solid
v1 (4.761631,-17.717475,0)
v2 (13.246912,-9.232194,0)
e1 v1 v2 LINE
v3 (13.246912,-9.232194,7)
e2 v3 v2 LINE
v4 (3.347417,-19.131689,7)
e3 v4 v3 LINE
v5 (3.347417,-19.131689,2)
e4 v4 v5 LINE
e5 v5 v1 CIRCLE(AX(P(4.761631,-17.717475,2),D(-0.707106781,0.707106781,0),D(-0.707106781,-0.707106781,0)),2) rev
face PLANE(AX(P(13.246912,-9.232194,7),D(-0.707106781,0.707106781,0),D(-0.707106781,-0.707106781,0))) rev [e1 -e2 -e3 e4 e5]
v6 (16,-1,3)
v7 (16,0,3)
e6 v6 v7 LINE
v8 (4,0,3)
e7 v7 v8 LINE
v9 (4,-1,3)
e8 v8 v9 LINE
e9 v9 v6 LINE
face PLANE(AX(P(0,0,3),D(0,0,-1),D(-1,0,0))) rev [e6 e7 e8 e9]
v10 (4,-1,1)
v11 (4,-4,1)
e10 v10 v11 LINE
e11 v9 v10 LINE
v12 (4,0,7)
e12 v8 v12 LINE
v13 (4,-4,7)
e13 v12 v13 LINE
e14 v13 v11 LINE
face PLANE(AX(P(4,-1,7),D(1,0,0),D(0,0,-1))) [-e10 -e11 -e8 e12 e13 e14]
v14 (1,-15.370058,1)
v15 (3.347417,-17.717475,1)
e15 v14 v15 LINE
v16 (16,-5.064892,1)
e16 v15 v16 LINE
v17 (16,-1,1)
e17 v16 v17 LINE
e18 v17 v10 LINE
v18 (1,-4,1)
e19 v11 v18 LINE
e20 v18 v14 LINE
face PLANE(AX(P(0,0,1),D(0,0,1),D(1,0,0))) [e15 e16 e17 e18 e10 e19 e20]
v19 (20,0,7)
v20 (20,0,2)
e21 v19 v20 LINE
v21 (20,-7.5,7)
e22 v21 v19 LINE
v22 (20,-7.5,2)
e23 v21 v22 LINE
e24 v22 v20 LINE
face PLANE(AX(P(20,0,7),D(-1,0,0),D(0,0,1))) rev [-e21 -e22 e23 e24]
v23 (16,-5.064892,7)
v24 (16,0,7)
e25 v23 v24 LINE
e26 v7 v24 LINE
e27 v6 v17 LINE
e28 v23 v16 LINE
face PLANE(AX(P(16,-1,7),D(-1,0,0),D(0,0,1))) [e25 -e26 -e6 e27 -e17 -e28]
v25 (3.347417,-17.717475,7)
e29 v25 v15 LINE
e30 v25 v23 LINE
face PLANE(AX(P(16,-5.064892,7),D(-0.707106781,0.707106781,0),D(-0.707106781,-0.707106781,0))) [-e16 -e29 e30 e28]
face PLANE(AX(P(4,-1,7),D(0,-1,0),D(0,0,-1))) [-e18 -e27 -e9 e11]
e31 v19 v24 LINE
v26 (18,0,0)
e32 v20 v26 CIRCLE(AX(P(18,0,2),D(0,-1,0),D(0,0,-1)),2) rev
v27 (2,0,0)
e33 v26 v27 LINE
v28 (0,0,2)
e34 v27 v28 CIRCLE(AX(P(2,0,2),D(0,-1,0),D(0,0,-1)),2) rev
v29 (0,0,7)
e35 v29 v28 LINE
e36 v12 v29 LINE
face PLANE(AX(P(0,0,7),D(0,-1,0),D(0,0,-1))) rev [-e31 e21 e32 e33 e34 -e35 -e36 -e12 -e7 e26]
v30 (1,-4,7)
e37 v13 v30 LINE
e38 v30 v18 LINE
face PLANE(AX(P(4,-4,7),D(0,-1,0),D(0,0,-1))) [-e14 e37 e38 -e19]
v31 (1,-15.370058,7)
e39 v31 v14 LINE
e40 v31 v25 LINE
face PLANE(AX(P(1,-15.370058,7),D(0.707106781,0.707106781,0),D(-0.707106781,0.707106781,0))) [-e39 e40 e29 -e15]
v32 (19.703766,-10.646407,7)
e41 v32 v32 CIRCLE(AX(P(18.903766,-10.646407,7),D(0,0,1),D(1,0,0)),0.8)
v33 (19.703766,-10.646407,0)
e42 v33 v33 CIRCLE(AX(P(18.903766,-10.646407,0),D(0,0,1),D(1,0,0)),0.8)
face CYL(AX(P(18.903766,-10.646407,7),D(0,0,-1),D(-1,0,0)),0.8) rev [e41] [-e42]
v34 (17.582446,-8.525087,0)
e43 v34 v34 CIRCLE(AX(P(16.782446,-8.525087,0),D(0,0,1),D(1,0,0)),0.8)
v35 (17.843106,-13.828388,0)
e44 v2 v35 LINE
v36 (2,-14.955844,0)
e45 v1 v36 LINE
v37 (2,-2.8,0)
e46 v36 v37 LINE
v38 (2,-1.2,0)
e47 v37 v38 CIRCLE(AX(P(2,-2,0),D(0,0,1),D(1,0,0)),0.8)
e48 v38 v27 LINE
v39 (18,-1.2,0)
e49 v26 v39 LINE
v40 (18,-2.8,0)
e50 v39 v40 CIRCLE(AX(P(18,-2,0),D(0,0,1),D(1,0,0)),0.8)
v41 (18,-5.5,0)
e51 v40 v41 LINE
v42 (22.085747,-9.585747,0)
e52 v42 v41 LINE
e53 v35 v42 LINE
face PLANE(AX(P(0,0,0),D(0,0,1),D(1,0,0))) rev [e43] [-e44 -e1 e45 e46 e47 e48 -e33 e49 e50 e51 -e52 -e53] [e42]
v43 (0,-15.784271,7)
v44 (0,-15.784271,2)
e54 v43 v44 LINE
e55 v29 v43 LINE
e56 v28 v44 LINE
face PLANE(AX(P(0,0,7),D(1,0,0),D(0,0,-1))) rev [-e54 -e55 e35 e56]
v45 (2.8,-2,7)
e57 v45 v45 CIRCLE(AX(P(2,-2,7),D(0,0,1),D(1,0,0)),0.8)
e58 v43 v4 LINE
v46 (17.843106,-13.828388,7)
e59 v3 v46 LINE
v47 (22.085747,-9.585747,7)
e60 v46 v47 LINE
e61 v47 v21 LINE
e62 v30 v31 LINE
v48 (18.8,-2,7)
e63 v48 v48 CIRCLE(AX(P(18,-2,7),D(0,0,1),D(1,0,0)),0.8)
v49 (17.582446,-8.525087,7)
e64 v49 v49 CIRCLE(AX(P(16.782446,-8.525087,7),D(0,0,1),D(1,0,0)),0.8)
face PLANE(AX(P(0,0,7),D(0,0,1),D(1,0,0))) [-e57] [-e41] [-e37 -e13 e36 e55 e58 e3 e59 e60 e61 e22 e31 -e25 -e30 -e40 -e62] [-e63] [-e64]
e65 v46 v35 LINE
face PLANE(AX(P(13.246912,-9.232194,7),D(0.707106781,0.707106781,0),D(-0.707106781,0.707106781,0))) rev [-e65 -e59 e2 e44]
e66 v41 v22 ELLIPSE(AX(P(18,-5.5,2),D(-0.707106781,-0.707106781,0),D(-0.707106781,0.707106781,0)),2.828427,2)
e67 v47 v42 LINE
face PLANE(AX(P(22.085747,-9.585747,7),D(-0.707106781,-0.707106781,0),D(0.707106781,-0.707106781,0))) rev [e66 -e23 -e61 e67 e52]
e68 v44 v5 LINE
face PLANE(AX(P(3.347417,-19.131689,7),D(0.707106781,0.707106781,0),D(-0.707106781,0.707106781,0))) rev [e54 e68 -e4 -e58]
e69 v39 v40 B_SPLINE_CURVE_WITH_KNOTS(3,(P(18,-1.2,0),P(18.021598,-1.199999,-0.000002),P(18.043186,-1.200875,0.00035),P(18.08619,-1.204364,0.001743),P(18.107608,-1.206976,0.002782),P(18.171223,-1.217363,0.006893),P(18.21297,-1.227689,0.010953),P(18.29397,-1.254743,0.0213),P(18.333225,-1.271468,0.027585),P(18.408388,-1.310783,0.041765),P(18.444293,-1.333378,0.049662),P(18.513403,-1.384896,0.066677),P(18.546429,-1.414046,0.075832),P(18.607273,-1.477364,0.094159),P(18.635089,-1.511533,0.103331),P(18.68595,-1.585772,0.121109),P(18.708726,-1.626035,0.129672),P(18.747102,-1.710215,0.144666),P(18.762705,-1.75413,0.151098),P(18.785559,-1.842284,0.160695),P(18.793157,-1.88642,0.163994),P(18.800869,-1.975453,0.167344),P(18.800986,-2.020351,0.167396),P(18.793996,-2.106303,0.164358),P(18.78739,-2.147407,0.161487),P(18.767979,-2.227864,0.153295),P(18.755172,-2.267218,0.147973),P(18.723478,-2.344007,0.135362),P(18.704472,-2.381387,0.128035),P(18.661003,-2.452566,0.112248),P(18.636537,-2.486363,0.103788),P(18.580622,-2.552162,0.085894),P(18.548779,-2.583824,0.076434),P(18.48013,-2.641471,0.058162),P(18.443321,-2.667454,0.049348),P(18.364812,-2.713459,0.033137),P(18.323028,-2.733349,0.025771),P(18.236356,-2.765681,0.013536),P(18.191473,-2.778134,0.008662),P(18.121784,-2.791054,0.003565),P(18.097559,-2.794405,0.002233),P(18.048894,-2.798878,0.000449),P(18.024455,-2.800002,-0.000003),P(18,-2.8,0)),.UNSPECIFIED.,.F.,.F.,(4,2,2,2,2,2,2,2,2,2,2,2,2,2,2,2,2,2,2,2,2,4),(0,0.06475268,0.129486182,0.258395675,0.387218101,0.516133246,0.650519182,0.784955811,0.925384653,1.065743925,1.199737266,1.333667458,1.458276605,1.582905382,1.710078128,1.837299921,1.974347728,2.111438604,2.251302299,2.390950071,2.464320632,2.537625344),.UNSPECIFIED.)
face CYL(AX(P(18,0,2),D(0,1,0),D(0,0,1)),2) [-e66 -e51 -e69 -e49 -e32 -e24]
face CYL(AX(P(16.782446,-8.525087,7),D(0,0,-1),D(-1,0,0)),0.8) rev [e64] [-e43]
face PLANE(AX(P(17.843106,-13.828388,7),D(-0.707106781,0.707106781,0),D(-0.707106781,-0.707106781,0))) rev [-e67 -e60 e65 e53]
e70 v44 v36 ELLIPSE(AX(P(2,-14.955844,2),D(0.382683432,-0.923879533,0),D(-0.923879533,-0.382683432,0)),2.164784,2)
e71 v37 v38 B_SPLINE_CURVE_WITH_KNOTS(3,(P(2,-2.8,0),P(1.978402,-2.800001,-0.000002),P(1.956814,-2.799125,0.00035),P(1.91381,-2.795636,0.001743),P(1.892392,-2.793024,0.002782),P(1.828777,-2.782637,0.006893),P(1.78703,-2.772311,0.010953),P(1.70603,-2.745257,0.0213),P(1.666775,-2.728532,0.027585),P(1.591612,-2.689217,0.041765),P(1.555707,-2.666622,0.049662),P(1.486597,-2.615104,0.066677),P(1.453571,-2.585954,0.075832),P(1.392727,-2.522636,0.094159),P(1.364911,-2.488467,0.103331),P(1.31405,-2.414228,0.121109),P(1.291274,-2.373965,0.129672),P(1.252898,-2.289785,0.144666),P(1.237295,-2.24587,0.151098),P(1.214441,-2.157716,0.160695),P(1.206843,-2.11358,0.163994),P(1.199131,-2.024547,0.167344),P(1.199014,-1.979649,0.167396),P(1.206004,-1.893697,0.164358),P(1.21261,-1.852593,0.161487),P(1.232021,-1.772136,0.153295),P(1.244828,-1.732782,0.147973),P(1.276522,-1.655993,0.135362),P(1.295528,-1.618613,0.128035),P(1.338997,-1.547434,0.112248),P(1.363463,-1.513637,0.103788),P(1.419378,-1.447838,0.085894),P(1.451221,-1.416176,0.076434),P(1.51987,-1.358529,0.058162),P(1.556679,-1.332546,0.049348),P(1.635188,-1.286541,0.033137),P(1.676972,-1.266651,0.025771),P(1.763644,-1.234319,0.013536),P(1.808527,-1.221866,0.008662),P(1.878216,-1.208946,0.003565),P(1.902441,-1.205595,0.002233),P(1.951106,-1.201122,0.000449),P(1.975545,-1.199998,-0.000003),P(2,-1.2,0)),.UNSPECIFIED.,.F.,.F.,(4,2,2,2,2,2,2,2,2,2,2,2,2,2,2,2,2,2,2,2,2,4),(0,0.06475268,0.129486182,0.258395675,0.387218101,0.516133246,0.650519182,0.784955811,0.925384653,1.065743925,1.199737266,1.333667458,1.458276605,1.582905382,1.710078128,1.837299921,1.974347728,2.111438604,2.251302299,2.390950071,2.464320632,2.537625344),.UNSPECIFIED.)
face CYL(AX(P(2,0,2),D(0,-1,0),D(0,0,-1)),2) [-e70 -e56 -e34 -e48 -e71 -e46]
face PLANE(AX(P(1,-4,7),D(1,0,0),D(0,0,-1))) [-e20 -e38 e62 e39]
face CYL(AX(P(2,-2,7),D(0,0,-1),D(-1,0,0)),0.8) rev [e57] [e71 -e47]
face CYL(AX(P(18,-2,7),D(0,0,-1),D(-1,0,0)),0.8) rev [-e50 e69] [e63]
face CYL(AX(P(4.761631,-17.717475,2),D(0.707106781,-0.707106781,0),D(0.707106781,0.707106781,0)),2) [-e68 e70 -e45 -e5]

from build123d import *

# Parameters (mm, degrees)
BOSS_EXTRUDE1_DEPTH = 7
BOSS_EXTRUDE2_DEPTH = 1
SKETCH5_R           = 0.799999999
SKETCH5_R_2         = 0.800000001
SCREW_HOLES_DEPTH   = 31.046659105
FILLET1_R           = 2
CUT_EXTRUDE2_START  = 7
SKETCH7_W           = 11.999999998
SKETCH7_H           = 4
CUT_EXTRUDE2_DEPTH  = 4


with BuildPart() as part:
    # Sketch1 → Boss-Extrude1 (new body)
    with BuildSketch(Plane.XY):
        Polygon((0, 0), (19.999999998, 0), (19.999999998, -7.5), (22.085746954, -9.585746956), (17.843106269, -13.828387641), (13.246912191, -9.232193563), (3.347417254, -19.1316885), (0, -15.784271246), align=None)
        Polygon((4, -1), (4, -4), (1, -4), (1, -15.370057685), (3.347417253, -17.717474938), (15.999999998, -5.064892192), (15.999999998, -1), align=None, mode=Mode.SUBTRACT)
    extrude(amount=BOSS_EXTRUDE1_DEPTH)

    # Sketch6 → Boss-Extrude2 (add)
    with BuildSketch(Plane.XY):
        Polygon((0, 0), (19.999999998, 0), (19.999999998, -7.5), (22.085746954, -9.585746956), (17.843106269, -13.828387641), (13.246912191, -9.232193563), (3.347417254, -19.1316885), (0, -15.784271246), align=None)
    extrude(amount=BOSS_EXTRUDE2_DEPTH)

    # Sketch5 → Screw Holes (cut, through all)
    with BuildSketch(Plane.XY):
        with Locations((18.90376644, -10.646407127)):
            Circle(SKETCH5_R)
        with Locations((16.782446096, -8.525086783)):
            Circle(SKETCH5_R)
        with Locations((1.999999999, -2)):
            Circle(SKETCH5_R_2)
        with Locations((17.999999999, -2)):
            Circle(SKETCH5_R_2)
    extrude(amount=SCREW_HOLES_DEPTH, mode=Mode.SUBTRACT)

    # Fillet1
    # the kernel refuses this fillet: 2 mm, written as the material it takes off along each edge
    with BuildSketch(Plane(origin=(19.999999998, 5, 0), x_dir=(-1, 0, 0), z_dir=(0, -1, 0))) as fillet1_piece_1_section:
        with BuildLine():
            CenterArc((FILLET1_R, -FILLET1_R), FILLET1_R, 90, 90)
            Line((0, -FILLET1_R), (0, 0))
            Line((0, 0), (FILLET1_R, 0))
        make_face()
    fillet1_piece_1 = extrude(amount=17.5, mode=Mode.PRIVATE)
    fillet1_piece_1 = split(fillet1_piece_1, bisect_by=Plane(origin=(16.546980954, -4.046980955, 0.4619066), z_dir=(0.7071067811865476, 0.7071067811865476, 0)), keep=Keep.TOP, mode=Mode.PRIVATE)
    add(fillet1_piece_1, mode=Mode.SUBTRACT)
    with BuildSketch(Plane(origin=(6.88295116, -22.667222406, 0), x_dir=(0.7071067811865475, 0.7071067811865477, 0), z_dir=(-0.7071067811865477, 0.7071067811865475, 0))) as fillet1_piece_2:
        with BuildLine():
            CenterArc((FILLET1_R, -FILLET1_R), FILLET1_R, 90, 90)
            Line((0, -FILLET1_R), (0, 0))
            Line((0, 0), (FILLET1_R, 0))
        make_face()
    extrude(amount=14.73396288, mode=Mode.SUBTRACT)
    with BuildSketch(Plane(origin=(0, -20.784271246, 0), x_dir=(1, 0, 0), z_dir=(0, 1, 0))) as fillet1_piece_3:
        with BuildLine():
            CenterArc((FILLET1_R, -FILLET1_R), FILLET1_R, 90, 90)
            Line((0, -FILLET1_R), (0, 0))
            Line((0, 0), (FILLET1_R, 0))
        make_face()
    extrude(amount=25.784271246, mode=Mode.SUBTRACT)

    # Sketch7 → Cut-Extrude2 (cut)
    with BuildSketch(Plane.XY.offset(CUT_EXTRUDE2_START)):
        with Locations((9.999999999, -2)):
            Rectangle(SKETCH7_W, SKETCH7_H)
    extrude(amount=-CUT_EXTRUDE2_DEPTH, mode=Mode.SUBTRACT)


solid = part.part
